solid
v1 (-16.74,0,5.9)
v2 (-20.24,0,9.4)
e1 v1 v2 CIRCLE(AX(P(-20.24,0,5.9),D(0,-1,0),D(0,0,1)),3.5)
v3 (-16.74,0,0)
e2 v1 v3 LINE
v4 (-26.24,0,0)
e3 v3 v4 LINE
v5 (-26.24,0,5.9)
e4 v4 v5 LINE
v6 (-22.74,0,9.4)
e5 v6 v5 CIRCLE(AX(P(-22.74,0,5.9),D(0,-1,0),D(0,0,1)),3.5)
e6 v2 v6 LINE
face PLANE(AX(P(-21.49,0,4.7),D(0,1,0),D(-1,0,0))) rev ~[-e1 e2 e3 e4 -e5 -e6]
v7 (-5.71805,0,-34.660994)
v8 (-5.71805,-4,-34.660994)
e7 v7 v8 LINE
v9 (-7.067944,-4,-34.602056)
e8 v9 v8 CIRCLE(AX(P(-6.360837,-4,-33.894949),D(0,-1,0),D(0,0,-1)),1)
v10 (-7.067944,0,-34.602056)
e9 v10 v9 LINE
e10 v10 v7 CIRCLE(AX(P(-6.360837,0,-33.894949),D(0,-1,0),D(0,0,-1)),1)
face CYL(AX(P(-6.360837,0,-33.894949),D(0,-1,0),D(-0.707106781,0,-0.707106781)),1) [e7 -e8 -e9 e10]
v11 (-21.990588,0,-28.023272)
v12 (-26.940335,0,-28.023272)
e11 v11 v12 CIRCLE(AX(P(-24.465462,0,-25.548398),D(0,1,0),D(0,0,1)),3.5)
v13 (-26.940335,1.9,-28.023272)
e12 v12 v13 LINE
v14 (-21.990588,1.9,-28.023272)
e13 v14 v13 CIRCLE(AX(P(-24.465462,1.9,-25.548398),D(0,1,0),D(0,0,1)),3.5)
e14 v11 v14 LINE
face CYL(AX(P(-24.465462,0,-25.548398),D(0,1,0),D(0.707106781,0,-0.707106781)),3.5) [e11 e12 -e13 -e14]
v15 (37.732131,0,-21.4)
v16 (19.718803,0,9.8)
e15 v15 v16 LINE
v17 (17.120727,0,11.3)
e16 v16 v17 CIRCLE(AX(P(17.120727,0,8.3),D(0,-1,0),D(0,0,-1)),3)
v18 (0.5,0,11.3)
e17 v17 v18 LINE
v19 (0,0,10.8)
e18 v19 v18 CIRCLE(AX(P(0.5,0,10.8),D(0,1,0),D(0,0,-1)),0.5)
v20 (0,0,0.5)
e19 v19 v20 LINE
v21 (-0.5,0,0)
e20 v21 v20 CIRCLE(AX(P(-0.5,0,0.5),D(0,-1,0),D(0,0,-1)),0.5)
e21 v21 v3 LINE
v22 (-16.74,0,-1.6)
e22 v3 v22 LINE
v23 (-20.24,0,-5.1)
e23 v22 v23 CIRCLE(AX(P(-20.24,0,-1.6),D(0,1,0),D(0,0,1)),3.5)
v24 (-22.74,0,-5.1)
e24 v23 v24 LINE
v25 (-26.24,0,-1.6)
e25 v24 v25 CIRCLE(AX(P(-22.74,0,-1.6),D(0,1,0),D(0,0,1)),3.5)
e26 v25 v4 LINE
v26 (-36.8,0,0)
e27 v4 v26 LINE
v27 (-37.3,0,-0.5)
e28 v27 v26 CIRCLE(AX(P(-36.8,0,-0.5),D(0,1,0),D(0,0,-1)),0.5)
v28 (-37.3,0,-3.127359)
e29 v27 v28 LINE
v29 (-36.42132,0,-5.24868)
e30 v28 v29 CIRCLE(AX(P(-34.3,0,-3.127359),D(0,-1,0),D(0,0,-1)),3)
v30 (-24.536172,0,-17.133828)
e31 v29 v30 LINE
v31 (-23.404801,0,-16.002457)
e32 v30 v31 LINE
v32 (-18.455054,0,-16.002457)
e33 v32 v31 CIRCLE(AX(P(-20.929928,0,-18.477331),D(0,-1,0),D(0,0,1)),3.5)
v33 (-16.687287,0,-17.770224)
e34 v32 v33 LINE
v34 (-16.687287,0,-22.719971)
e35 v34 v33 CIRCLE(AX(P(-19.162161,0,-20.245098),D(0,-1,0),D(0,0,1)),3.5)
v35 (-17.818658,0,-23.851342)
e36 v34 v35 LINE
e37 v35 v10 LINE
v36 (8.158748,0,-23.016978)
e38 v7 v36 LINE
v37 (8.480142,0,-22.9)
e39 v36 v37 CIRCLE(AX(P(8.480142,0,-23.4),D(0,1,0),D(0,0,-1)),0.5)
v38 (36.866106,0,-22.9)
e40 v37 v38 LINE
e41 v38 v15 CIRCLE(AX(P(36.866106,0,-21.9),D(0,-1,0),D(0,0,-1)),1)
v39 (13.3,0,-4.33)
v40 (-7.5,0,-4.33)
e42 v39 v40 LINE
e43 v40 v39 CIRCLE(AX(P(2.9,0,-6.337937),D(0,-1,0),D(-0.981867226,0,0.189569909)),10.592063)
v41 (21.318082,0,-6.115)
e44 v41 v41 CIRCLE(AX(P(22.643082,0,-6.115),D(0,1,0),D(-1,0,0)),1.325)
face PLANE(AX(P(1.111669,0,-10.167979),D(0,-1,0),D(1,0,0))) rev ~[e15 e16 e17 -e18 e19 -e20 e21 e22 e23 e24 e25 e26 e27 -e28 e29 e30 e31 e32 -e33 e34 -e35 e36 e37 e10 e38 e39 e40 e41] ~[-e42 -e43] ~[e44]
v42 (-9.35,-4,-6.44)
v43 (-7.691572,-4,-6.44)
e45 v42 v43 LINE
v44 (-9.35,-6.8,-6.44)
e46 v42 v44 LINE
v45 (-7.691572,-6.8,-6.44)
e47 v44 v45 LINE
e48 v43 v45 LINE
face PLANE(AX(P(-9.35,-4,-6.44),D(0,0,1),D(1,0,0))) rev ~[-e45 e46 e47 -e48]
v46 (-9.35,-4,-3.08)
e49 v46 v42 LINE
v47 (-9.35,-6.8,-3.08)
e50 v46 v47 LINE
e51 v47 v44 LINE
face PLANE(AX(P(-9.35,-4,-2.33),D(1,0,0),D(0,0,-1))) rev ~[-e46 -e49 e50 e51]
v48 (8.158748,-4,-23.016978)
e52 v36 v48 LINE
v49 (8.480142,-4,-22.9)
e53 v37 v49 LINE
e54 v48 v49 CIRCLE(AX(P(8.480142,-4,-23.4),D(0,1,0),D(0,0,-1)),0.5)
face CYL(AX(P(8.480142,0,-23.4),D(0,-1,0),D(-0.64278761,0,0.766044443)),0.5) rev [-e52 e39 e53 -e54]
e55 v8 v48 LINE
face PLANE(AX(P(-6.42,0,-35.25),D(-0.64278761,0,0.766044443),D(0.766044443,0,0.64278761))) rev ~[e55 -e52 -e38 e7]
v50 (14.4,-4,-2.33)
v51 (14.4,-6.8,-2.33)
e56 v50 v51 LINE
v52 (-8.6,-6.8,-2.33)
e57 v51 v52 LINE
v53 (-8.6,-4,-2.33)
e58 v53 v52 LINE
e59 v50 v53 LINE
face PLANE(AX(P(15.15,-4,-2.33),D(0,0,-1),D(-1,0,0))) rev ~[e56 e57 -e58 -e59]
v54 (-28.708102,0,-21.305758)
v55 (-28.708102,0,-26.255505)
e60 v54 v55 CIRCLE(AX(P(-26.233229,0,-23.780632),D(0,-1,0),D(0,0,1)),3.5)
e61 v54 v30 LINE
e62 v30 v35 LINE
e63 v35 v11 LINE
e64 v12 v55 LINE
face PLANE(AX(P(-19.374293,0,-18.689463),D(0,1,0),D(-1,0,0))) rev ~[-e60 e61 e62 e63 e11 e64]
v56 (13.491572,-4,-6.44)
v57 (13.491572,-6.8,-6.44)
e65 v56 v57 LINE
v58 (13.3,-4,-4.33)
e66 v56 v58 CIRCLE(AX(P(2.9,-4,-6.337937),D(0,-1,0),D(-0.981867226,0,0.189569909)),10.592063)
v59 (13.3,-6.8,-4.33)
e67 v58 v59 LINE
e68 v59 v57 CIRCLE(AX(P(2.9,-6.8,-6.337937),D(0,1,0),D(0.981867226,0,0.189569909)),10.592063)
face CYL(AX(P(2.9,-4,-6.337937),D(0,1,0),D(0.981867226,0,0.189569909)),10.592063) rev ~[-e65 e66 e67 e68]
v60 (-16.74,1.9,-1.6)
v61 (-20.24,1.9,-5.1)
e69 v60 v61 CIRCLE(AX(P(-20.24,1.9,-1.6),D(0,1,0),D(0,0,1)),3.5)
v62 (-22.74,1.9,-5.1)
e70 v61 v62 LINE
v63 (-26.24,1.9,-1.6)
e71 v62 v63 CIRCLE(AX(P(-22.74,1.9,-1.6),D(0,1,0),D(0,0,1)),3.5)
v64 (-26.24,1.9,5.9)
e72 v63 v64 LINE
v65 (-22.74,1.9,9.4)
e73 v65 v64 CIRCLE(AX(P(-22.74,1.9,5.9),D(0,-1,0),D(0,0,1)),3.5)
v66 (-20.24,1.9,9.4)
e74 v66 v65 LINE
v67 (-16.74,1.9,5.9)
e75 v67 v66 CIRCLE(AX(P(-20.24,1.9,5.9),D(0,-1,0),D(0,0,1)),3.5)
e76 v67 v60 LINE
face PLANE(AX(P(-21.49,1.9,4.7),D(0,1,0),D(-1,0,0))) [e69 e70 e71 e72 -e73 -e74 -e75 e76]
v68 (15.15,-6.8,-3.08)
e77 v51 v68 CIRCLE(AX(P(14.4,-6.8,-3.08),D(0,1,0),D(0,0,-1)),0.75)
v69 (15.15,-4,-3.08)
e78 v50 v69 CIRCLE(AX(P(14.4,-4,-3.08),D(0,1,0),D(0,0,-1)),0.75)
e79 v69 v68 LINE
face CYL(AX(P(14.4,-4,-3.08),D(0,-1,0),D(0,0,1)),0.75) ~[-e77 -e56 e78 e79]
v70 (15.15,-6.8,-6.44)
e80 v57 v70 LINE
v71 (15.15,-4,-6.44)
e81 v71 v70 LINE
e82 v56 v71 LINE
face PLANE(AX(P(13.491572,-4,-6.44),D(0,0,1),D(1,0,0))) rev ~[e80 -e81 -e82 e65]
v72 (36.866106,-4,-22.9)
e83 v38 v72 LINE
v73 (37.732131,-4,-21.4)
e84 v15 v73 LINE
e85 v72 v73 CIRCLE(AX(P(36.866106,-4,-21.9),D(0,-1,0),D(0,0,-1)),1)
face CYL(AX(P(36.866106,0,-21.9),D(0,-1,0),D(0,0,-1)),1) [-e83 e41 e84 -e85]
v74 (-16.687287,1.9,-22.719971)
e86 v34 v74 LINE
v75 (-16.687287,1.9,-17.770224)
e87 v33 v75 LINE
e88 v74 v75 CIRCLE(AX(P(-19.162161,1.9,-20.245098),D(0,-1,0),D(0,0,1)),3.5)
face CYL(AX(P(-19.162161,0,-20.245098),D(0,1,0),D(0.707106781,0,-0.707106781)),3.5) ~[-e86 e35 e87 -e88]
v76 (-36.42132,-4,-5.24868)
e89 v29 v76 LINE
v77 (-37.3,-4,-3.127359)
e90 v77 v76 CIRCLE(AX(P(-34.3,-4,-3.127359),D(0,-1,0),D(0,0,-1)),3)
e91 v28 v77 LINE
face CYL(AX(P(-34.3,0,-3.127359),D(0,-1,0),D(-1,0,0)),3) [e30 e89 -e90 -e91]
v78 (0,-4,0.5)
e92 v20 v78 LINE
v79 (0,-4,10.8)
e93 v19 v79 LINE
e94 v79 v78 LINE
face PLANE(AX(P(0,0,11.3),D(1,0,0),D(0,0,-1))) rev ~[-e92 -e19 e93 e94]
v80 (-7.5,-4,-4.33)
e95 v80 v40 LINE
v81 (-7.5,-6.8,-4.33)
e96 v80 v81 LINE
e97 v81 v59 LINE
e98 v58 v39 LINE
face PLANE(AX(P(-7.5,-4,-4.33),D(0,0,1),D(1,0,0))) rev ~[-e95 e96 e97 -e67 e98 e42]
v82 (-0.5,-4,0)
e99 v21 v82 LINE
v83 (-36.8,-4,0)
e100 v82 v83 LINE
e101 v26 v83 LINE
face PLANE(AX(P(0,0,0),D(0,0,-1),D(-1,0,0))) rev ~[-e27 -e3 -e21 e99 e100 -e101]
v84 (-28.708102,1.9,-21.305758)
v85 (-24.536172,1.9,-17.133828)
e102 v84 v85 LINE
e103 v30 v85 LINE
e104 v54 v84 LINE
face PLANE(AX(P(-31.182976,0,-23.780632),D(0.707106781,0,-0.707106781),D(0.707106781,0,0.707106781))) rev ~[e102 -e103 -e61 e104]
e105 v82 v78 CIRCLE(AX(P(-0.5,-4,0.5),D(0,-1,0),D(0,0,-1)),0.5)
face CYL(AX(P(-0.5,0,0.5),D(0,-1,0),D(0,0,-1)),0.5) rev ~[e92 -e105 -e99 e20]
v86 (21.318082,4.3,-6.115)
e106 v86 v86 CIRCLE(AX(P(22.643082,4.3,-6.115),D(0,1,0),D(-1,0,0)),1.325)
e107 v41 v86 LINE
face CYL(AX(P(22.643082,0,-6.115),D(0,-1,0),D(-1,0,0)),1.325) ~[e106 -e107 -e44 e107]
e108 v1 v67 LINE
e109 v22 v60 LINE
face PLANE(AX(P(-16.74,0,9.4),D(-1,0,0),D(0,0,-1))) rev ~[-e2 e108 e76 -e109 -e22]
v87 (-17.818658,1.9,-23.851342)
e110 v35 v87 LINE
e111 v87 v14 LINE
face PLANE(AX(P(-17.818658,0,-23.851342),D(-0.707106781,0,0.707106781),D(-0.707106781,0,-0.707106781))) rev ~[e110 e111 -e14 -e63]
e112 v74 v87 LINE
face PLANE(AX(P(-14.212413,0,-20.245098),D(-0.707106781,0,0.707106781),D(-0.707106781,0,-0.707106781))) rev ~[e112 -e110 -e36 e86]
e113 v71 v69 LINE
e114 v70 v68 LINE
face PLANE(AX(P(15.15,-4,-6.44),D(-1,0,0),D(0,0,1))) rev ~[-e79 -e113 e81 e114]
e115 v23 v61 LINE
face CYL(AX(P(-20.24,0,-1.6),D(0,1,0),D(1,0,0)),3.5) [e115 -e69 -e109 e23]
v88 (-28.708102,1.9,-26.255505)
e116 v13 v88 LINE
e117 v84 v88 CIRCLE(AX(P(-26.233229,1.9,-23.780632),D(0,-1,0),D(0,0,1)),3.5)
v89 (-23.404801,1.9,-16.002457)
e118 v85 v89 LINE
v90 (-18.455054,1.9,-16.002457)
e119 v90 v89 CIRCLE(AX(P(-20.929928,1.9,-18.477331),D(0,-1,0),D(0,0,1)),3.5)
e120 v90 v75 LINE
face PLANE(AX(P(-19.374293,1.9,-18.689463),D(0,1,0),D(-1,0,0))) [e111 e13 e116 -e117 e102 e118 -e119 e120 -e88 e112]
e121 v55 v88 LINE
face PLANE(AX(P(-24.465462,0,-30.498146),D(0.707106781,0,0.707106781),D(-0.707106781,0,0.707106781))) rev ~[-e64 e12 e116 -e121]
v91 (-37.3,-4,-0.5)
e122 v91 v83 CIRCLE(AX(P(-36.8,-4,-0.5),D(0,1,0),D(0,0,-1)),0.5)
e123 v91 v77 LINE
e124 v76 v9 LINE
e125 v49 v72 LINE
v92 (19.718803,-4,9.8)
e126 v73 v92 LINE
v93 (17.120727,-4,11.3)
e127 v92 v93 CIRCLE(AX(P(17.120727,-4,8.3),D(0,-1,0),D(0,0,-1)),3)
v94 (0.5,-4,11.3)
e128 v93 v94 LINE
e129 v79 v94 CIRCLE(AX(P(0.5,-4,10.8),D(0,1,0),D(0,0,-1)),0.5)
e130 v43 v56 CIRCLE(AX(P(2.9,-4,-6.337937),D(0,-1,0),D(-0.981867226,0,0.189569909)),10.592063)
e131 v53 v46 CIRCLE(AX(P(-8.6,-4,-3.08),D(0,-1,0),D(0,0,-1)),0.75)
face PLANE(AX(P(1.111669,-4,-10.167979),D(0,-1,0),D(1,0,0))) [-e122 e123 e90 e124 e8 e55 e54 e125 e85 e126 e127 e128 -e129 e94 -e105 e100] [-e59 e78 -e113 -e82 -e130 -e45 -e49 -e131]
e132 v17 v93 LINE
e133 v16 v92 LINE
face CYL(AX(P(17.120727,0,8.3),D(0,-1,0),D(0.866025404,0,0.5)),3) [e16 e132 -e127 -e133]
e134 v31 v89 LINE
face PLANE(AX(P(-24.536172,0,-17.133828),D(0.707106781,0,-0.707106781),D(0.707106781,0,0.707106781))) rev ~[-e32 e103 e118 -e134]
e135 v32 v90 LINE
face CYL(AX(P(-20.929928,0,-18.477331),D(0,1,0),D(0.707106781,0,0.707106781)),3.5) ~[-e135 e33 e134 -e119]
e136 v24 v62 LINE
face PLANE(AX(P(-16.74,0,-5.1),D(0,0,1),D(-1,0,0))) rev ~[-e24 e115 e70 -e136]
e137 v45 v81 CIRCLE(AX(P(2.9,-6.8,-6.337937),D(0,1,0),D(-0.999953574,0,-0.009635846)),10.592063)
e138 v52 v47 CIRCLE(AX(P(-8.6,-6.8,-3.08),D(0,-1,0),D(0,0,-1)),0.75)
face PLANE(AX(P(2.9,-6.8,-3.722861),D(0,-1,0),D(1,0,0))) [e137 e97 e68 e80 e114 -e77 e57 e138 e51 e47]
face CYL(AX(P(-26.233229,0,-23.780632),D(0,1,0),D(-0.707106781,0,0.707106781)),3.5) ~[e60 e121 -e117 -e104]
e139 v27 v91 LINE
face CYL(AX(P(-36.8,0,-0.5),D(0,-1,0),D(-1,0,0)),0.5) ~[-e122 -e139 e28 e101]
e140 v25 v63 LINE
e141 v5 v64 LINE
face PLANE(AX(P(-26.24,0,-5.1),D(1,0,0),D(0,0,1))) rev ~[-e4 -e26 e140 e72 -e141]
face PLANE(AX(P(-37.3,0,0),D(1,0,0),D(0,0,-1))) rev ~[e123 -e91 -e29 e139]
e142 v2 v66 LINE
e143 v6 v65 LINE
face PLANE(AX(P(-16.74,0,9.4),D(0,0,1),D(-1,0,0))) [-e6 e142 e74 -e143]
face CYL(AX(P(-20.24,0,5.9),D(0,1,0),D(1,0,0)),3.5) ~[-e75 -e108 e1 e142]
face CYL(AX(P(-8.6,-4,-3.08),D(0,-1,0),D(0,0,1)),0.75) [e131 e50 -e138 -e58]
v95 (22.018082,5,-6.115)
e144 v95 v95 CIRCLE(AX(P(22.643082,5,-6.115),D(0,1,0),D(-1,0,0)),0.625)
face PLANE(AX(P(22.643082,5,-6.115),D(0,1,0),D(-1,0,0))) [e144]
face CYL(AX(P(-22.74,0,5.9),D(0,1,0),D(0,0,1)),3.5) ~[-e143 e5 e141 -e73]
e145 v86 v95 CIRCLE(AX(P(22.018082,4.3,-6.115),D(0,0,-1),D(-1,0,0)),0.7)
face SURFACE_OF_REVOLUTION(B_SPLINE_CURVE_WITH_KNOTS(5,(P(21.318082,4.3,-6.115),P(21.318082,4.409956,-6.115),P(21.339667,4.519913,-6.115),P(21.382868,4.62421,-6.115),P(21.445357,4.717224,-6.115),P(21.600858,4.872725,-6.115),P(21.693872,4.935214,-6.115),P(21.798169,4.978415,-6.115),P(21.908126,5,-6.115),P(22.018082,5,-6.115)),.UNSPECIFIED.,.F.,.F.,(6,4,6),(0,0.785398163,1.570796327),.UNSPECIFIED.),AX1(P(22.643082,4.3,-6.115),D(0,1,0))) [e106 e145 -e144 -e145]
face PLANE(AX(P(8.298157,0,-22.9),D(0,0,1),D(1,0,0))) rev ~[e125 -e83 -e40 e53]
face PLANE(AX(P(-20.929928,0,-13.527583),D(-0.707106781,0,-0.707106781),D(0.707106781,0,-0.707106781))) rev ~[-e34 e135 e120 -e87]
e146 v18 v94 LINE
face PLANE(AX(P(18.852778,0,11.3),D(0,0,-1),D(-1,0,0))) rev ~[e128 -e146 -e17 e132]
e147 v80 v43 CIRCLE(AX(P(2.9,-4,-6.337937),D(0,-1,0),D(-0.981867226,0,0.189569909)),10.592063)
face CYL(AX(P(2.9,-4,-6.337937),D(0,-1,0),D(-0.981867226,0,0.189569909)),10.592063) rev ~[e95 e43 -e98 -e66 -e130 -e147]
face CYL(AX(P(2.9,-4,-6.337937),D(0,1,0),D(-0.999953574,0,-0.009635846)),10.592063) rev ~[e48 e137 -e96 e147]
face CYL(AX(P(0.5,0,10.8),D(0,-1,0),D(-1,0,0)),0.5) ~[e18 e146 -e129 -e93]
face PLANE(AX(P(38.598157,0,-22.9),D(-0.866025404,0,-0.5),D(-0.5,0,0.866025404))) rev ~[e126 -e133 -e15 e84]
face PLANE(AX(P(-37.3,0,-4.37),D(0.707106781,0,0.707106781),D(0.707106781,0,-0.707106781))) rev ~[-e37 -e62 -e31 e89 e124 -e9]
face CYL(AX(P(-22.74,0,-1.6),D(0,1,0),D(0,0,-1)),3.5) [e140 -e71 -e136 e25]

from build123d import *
from build123d import SkipClean  # not in build123d's __all__

# Parameters (mm, degrees)
F1_DEPTH  = 4
F2_R      = 3
F3_R      = 1
F4_R      = 0.5
F6_DEPTH  = 25
F8_DEPTH  = 2.8
F9_R      = 0.75
F10_W     = 9.5
F10_H     = 9.4
F10_H_2   = 5.1
F11_DEPTH = 1.9
F12_R     = 3.5
F13_R     = 1.325
F14_DEPTH = 5
F15_R     = 0.7


# Not quite as in the source:
# - after a boolean that leaves OpenCascade's solid faulty, fix() repairs it


with BuildPart() as f1:
    # F0 (on Front) → F1 (new body)
    with BuildSketch(Plane.XZ):
        Polygon((0, 11.3), (0, 0), (-37.3, 0), (-37.3, -4.37), (-6.42, -35.25), (8.2981568685, -22.9), (38.5981568685, -22.9), (18.8527776623, 11.3), align=None)
    extrude(amount=F1_DEPTH)

    # F2
    f2_edges = [f1.edges().sort_by_distance(p)[0] for p in [
        (-37.3, -2, -4.37),
        (18.852778, -2, 11.3),
    ]]
    fillet(f2_edges, radius=F2_R)

    # F3
    f3_edges = [f1.edges().sort_by_distance(p)[0] for p in [
        (38.598157, -2, -22.9),
        (-6.42, -2, -35.25),
    ]]
    fillet(f3_edges, radius=F3_R)

    # F4
    f4_edges = [f1.edges().sort_by_distance(p)[0] for p in [
        (8.298157, -2, -22.9),
        (0, -2, 0),
        (0, -2, 11.3),
        (-37.3, -2, 0),
    ]]
    fillet(f4_edges, radius=F4_R)

    # F5 (on face) → F6 (cut)
    with BuildSketch(Plane.XZ.offset(4)):
        with BuildLine():
            Line((13.3, -4.33), (-7.5, -4.33))
            ThreePointArc((-7.5, -4.33), (2.9, -16.93), (13.3, -4.33))
        make_face()
    extrude(amount=-F6_DEPTH, mode=Mode.SUBTRACT)

    # F7 (on face) → F8 (join)
    with BuildSketch(Plane.XZ.offset(4)):
        with BuildLine():
            Line((15.15, -2.33), (-9.35, -2.33))
            Line((-9.35, -2.33), (-9.35, -6.44))
            Line((-9.35, -6.44), (-7.6915717466, -6.44))
            ThreePointArc((-7.6915717466, -6.44), (-7.6486750873, -5.3801980668), (-7.5, -4.33))
            Line((-7.5, -4.33), (13.3, -4.33))
            ThreePointArc((13.3, -4.33), (13.4486750873, -5.3801980668), (13.4915717466, -6.44))
            Line((13.4915717466, -6.44), (15.15, -6.44))
            Line((15.15, -6.44), (15.15, -2.33))
        make_face()
    with SkipClean():  # cleaning this boolean's faces spoils the solid; the shape is the same uncleaned
        extrude(amount=F8_DEPTH)

    # F9
    f9_edges = [f1.edges().sort_by_distance(p)[0] for p in [
        (-9.35, -5.4, -2.33),
        (15.15, -5.4, -2.33),
    ]]
    fillet(f9_edges, radius=F9_R)

    # F10 (on face) → F11 (join)
    with BuildSketch(Plane(origin=(0, 0, 0), x_dir=(-1, 0, 0), z_dir=(0, 1, 0))):
        with Locations((21.49, 4.7)):
            Rectangle(F10_W, F10_H)
        with Locations((21.49, -2.55)):
            Rectangle(F10_W, F10_H_2)
        Polygon((17.8186578158, -23.8513421842), (24.5361722371, -17.1338277629), (20.929927653, -13.5275831789), (14.2124132317, -20.2450976002), align=None)
        Polygon((31.1829759802, -23.7806315061), (24.5361722371, -17.1338277629), (17.8186578158, -23.8513421842), (24.4654615589, -30.4981459274), align=None)
    extrude(amount=F11_DEPTH)

    add(f1.part.fix(), mode=Mode.REPLACE)

    # F12
    f12_edges = [f1.edges().sort_by_distance(p)[0] for p in [
        (-24.465462, 0.95, -30.498146),
        (-31.182976, 0.95, -23.780632),
        (-14.212413, 0.95, -20.245098),
        (-20.929928, 0.95, -13.527583),
        (-26.24, 0.95, 9.4),
        (-16.74, 0.95, 9.4),
        (-26.24, 0.95, -5.1),
        (-16.74, 0.95, -5.1),
    ]]
    fillet(f12_edges, radius=F12_R)

    # F13 (on face) → F14 (join)
    with BuildSketch(Plane(origin=(0, 0, 0), x_dir=(-1, 0, 0), z_dir=(0, 1, 0))):
        with Locations((-22.6430821795, -6.115)):
            Circle(F13_R)
    extrude(amount=F14_DEPTH)

    # F15
    f15_edges = [f1.edges().sort_by_distance(p)[0] for p in [
        (23.968082, 5, -6.115),
    ]]
    fillet(f15_edges, radius=F15_R)


solid = f1.part
